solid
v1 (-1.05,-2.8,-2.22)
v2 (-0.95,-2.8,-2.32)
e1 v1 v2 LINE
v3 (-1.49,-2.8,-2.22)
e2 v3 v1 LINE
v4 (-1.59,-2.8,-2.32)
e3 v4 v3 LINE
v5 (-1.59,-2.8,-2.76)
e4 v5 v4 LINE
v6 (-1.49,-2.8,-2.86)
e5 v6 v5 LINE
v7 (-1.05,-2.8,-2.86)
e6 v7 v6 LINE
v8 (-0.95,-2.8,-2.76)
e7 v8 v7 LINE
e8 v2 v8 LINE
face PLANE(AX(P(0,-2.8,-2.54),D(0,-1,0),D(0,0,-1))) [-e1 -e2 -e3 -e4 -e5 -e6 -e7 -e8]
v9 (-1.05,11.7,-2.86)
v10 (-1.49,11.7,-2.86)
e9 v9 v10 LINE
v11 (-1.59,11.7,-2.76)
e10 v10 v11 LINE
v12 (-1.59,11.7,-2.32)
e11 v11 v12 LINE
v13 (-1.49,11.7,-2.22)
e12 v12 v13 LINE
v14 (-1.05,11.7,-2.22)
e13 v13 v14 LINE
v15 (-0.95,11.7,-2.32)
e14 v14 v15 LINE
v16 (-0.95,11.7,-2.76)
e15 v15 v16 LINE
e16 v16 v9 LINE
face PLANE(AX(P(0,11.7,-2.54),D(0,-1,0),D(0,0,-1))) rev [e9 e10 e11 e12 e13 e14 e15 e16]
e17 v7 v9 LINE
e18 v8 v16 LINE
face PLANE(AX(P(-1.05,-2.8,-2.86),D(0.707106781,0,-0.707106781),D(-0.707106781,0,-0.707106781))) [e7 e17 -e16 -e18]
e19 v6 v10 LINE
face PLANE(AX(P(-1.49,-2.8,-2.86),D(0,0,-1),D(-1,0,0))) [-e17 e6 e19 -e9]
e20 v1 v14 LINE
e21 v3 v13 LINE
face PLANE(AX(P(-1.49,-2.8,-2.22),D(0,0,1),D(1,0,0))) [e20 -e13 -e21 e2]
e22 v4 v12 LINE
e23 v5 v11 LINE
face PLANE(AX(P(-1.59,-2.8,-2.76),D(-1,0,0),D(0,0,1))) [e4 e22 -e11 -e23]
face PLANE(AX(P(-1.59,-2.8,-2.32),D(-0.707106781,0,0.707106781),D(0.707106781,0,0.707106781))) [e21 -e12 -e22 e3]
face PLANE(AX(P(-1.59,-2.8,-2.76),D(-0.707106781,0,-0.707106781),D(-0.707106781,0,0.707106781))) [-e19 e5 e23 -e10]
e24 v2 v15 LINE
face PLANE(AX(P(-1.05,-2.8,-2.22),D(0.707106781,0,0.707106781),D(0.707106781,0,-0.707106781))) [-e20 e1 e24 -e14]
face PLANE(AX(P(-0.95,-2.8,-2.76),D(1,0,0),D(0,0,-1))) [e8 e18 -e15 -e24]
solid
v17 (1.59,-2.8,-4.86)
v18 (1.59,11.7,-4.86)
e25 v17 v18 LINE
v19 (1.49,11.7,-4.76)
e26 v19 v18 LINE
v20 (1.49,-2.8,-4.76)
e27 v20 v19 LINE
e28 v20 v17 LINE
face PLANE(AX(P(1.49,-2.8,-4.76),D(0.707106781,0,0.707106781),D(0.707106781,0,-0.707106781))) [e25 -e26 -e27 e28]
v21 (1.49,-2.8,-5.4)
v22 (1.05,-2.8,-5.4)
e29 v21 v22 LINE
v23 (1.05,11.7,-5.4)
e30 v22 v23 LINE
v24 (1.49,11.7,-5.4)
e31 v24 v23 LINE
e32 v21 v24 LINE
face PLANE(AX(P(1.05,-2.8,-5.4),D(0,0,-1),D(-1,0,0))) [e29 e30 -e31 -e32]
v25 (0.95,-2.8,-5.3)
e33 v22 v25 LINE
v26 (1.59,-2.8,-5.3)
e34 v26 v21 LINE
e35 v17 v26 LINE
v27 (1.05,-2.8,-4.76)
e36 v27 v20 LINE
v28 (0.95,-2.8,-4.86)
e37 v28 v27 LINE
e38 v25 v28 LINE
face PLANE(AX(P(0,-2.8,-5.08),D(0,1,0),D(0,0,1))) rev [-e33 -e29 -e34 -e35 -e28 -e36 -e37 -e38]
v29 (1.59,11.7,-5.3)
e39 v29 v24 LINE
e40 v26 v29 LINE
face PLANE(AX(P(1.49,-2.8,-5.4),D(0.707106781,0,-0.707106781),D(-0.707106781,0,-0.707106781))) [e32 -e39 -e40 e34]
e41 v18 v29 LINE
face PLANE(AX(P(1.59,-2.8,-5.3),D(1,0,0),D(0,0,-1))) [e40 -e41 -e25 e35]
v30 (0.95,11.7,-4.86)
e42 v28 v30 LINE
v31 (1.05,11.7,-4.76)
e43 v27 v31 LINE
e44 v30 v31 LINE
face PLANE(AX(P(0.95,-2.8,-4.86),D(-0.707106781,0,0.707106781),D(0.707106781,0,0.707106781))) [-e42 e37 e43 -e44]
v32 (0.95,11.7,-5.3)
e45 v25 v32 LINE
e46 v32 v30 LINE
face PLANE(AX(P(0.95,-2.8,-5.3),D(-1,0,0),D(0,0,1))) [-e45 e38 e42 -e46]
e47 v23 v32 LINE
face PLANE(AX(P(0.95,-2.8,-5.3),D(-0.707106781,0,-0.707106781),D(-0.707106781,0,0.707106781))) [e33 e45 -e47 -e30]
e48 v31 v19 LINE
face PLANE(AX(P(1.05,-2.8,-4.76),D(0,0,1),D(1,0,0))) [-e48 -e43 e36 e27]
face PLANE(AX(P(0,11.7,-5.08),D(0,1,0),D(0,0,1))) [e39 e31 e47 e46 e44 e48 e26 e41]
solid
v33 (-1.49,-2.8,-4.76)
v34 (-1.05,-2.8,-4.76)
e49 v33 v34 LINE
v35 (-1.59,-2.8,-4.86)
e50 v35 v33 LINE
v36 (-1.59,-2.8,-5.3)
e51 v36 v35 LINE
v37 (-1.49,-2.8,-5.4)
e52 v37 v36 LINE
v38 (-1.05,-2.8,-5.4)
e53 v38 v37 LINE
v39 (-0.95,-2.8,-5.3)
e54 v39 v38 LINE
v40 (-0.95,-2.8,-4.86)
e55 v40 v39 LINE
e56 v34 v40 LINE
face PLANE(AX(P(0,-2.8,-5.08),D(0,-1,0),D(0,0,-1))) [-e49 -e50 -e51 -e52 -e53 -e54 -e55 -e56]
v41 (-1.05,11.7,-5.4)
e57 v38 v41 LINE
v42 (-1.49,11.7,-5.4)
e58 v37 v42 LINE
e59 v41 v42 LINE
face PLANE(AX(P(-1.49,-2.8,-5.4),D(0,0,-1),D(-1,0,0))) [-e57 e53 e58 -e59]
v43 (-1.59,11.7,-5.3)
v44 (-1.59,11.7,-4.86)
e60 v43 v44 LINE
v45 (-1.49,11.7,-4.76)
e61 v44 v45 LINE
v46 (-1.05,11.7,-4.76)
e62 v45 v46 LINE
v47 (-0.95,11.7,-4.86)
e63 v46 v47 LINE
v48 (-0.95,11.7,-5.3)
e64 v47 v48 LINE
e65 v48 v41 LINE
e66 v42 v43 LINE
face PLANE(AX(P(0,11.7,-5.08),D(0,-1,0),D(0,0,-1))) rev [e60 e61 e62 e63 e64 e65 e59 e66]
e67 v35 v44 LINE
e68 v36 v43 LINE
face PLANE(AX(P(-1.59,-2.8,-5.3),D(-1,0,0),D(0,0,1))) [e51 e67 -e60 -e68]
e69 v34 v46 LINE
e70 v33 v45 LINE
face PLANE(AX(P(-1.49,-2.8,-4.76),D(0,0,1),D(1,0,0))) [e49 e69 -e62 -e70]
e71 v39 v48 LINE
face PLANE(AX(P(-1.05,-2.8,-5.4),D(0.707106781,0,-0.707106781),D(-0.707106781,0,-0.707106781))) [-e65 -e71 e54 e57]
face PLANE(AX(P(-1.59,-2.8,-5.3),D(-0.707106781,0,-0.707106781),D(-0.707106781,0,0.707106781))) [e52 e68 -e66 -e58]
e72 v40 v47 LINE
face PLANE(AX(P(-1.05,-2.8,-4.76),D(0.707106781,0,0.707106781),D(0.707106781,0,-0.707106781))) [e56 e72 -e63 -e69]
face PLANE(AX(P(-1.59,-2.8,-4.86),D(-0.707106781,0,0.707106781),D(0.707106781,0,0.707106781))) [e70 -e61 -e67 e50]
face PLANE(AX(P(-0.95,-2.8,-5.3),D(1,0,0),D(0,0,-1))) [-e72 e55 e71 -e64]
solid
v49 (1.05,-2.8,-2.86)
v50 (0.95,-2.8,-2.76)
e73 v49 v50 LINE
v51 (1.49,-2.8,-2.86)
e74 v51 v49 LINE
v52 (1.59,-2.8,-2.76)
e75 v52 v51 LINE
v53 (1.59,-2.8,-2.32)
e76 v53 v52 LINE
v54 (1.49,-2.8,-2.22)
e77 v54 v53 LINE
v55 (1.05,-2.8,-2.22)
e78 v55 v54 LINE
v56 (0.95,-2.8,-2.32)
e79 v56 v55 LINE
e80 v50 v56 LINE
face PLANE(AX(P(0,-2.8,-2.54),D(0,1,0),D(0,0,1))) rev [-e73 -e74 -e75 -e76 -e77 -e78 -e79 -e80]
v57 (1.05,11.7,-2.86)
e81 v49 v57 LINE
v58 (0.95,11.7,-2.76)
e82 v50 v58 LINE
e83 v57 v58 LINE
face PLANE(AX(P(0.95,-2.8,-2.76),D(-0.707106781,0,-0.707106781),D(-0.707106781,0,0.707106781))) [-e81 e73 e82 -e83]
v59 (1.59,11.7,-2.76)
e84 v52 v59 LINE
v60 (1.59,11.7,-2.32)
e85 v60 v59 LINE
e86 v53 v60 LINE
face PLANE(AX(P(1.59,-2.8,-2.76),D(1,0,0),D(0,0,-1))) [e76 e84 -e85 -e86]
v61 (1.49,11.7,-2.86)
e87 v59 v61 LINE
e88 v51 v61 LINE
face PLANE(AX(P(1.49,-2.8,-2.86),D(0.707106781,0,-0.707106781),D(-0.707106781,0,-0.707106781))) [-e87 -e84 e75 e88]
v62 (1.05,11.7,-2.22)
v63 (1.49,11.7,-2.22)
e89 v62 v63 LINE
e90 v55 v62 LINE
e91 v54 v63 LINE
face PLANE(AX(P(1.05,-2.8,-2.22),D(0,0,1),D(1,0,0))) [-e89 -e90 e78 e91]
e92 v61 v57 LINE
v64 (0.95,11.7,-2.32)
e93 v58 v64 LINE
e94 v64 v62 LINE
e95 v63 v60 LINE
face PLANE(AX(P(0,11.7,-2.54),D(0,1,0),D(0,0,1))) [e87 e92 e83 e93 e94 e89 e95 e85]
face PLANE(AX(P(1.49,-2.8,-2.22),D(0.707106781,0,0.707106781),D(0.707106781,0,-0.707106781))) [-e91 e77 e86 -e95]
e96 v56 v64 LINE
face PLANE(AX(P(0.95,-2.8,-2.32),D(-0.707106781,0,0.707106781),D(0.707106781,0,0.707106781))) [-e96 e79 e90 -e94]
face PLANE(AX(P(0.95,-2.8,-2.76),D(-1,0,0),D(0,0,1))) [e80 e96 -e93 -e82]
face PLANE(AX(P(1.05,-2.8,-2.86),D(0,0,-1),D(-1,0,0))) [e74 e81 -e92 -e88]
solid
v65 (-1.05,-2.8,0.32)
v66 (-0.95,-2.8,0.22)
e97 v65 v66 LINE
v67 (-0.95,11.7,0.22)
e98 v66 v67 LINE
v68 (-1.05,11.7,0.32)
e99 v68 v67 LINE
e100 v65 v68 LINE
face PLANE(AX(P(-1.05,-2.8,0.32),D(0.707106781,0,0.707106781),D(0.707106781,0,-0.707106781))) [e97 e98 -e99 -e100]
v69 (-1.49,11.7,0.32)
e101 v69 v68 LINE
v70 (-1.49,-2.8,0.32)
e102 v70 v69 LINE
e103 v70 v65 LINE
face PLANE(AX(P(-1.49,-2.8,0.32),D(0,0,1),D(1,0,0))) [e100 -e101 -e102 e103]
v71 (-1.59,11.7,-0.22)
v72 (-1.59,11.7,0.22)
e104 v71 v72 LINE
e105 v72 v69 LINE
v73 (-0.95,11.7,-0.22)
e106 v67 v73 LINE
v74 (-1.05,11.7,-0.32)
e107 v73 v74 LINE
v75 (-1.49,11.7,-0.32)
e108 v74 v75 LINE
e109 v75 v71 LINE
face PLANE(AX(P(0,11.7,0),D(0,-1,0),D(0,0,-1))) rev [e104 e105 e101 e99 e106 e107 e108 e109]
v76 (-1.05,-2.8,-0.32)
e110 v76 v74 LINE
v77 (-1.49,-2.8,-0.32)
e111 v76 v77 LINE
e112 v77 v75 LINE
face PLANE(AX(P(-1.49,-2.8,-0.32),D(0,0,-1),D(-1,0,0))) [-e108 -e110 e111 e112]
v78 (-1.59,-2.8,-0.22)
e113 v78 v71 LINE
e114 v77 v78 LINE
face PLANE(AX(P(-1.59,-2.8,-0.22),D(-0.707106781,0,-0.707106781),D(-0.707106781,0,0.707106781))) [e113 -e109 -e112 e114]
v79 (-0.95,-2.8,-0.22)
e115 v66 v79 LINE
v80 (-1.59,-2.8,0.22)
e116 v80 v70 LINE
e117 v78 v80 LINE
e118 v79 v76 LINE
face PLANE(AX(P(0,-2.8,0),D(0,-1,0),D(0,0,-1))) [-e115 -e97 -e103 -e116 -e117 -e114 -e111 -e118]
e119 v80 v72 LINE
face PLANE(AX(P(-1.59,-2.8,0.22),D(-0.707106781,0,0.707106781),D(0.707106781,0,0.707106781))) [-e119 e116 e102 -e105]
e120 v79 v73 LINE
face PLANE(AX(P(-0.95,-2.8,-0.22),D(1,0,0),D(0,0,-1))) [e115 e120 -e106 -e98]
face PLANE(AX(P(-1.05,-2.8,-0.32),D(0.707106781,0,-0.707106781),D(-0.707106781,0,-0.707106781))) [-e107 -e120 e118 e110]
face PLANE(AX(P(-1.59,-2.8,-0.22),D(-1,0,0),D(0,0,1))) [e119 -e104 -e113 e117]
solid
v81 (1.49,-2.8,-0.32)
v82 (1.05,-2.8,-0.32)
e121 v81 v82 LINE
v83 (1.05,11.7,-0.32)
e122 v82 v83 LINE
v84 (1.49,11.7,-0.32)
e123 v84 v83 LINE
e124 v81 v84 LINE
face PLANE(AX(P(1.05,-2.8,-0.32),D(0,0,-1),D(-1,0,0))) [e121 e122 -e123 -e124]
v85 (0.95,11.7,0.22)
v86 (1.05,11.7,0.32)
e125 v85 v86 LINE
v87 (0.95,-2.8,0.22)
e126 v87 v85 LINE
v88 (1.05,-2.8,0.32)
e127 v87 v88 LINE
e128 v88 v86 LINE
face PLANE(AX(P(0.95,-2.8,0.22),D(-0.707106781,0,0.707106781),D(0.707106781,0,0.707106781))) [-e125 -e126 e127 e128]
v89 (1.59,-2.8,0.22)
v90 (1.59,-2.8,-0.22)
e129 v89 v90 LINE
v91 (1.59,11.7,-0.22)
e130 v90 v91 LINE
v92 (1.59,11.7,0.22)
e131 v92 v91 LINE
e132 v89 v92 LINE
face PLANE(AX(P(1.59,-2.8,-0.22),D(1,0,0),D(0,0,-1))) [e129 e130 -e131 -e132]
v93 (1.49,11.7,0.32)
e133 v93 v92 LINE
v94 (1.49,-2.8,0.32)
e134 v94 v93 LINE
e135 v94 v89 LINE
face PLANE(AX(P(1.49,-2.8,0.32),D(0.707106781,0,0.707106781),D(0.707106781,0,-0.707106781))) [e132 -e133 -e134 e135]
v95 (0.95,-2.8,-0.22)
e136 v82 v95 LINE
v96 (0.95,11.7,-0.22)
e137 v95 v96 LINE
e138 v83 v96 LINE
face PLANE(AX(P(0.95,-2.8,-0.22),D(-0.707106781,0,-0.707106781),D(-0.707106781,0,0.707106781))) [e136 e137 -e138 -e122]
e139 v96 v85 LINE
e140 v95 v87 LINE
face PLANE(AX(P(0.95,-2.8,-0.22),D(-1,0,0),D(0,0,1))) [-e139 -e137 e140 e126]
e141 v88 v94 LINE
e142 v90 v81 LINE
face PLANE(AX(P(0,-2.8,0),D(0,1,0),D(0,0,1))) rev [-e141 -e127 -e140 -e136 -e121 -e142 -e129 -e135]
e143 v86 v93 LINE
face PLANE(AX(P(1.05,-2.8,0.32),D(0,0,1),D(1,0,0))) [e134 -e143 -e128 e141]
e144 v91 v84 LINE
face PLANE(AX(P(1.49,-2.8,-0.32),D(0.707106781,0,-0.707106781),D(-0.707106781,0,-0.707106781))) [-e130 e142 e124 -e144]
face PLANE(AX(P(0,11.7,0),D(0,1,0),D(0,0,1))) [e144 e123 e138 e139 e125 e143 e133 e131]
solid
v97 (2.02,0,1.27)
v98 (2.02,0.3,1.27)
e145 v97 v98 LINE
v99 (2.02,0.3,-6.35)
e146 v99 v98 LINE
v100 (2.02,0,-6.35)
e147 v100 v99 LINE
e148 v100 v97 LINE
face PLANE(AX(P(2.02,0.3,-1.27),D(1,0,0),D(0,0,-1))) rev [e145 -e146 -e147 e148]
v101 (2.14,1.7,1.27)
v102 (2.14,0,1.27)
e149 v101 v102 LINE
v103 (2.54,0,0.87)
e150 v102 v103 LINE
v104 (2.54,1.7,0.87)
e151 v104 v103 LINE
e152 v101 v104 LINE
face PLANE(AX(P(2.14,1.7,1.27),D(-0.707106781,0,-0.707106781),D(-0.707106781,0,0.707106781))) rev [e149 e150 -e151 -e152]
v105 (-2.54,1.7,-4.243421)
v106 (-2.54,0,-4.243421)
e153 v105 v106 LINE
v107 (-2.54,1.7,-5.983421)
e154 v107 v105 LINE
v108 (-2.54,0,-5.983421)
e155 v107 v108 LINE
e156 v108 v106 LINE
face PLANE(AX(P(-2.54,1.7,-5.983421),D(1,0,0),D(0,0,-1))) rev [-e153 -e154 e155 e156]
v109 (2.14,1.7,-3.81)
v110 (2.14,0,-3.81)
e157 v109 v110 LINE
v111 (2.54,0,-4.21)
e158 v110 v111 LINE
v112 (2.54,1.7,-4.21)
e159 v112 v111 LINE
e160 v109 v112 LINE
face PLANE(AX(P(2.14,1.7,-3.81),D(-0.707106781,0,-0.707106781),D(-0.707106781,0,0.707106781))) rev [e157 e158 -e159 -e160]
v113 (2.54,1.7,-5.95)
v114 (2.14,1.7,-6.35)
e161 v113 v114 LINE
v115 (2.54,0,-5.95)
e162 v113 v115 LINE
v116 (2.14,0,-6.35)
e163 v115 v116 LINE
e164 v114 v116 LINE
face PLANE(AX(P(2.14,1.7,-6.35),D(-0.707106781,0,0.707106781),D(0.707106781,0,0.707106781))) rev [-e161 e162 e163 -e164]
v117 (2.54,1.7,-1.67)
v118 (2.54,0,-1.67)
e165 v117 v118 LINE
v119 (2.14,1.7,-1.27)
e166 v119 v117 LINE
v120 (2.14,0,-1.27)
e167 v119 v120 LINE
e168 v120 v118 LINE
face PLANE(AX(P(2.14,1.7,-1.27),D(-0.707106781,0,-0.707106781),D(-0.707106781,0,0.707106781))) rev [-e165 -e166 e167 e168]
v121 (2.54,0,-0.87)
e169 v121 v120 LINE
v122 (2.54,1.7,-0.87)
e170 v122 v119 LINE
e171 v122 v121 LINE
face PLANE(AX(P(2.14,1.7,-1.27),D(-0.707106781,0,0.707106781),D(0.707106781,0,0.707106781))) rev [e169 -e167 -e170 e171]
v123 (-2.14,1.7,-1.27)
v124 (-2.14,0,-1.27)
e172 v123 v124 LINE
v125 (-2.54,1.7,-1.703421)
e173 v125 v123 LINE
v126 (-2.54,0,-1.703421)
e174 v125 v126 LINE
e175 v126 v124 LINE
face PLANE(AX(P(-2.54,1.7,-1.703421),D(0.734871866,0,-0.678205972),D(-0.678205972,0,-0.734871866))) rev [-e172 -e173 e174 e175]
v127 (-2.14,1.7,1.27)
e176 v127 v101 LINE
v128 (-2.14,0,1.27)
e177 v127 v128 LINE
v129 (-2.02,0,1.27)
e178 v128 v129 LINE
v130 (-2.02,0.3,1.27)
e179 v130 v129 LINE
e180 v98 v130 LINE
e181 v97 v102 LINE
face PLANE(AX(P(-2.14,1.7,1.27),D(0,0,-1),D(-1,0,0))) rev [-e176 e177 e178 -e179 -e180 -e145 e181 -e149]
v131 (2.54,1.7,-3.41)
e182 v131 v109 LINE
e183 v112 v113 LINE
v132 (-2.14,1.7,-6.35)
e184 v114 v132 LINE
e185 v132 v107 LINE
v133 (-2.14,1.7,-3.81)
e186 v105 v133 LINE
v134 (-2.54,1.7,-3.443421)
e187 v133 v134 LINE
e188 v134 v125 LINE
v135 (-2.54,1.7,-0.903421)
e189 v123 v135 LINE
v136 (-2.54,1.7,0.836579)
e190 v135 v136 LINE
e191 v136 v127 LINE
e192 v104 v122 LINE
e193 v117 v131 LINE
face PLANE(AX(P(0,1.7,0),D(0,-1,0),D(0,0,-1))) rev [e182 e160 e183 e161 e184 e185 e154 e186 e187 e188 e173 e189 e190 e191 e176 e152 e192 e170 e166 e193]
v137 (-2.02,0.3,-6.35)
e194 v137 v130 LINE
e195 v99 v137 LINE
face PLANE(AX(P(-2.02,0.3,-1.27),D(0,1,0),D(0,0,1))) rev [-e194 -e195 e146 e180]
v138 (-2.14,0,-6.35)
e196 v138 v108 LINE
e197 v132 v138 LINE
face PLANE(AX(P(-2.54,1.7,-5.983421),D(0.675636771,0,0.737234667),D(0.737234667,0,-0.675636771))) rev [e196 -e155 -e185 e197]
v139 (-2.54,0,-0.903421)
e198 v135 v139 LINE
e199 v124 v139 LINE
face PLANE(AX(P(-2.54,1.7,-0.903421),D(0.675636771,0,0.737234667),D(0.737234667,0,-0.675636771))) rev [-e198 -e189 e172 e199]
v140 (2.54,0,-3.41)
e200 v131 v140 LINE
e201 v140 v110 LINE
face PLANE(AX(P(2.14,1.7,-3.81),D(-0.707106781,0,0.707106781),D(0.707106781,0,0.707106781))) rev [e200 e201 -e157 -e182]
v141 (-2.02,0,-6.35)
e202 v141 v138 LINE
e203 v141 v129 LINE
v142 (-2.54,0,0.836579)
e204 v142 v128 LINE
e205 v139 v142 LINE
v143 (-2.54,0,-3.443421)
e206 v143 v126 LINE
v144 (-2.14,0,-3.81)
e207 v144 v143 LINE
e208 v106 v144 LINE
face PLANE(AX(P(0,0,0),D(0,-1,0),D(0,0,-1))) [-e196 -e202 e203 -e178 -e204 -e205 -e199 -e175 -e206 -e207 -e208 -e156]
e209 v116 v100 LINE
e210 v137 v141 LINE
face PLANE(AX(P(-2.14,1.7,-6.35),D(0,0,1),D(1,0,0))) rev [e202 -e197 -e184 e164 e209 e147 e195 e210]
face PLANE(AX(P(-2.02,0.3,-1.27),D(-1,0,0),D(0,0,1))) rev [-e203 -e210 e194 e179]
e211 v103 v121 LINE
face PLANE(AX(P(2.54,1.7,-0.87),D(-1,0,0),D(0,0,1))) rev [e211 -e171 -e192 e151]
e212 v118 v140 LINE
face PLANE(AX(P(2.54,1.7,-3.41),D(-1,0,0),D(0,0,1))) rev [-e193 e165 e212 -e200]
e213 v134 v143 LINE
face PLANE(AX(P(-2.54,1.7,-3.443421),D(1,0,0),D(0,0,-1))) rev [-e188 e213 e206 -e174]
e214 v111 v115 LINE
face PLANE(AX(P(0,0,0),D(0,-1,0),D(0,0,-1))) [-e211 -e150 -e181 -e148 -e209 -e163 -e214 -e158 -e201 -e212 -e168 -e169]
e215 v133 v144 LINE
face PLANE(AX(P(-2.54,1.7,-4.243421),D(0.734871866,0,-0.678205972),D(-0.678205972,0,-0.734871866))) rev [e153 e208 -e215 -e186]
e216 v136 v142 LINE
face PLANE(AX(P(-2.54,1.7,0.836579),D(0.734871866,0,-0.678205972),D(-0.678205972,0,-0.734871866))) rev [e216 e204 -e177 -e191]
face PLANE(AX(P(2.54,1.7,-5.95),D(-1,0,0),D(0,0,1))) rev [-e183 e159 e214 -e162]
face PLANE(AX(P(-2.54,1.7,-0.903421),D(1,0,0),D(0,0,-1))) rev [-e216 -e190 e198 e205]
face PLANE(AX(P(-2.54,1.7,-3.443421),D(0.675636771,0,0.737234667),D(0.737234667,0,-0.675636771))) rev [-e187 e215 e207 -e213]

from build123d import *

# Parameters (mm, degrees)
BOSS_EXTRUDE1_DEPTH   = 1.7
SKETCH2_W             = 4.04
SKETCH2_H             = 0.3
CUT_EXTRUDE1_DEPTH    = 2.54
BOSS_EXTRUDE2_START   = -4.5
BOSS_EXTRUDE2_DEPTH   = 14.5
BOSS_EXTRUDE2_2_DEPTH = 14.5
LPATTERN3_START       = -2.8
LPATTERN3_DEPTH       = 14.5
LPATTERN3_2_DEPTH     = 14.5
LPATTERN3_3_DEPTH     = 14.5
LPATTERN3_4_DEPTH     = 14.5
LPATTERN3_START_2     = 0.3
LPATTERN3_5_DEPTH     = 1.4
LPATTERN3_6_DEPTH     = 0.3


# Read off the part's stored shape, not the designer's step: LPattern3
with BuildPart() as part:
    # Sketch1 → Boss-Extrude1 (new body)
    with BuildSketch(Plane(origin=(0, 0, 0), x_dir=(1, 0, 0), z_dir=(0, 1, 0))):
        Polygon((-2.54, 0.903421053), (-2.14, 1.27), (2.14, 1.27), (2.54, 0.87), (2.54, -0.87), (2.14, -1.27), (-2.14, -1.27), (-2.54, -0.836578947), align=None)
    extrude(amount=BOSS_EXTRUDE1_DEPTH)

    # Sketch2 → Cut-Extrude1 (cut)
    with BuildSketch(Plane.XY.offset(1.27)):
        with Locations((0, 0.15)):
            Rectangle(SKETCH2_W, SKETCH2_H)
    extrude(amount=-CUT_EXTRUDE1_DEPTH, mode=Mode.SUBTRACT)

    # LPattern3 5 outline → LPattern3 5 (add)
    with BuildSketch(Plane(origin=(0, 0, 0), x_dir=(1, 0, 0), z_dir=(0, 1, 0)).offset(LPATTERN3_START_2)):
        Polygon((-2.54, 3.443421053), (-2.54, 1.703421053), (-2.14, 1.27), (2.14, 1.27), (2.54, 1.67), (2.54, 3.41), (2.14, 3.81), (2.54, 4.21), (2.54, 5.95), (2.14, 6.35), (-2.14, 6.35), (-2.54, 5.983421053), (-2.54, 4.243421053), (-2.14, 3.81), align=None)
    extrude(amount=LPATTERN3_5_DEPTH)

    # LPattern3 6 outline → LPattern3 6 (add)
    with BuildSketch(Plane(origin=(0, 0, 0), x_dir=(1, 0, 0), z_dir=(0, 1, 0))):
        Polygon((-2.54, 3.443421053), (-2.54, 1.703421053), (-2.14, 1.27), (-2.02, 1.27), (-2.02, 6.35), (-2.14, 6.35), (-2.54, 5.983421053), (-2.54, 4.243421053), (-2.14, 3.81), align=None)
        Polygon((2.02, 6.35), (2.02, 1.27), (2.14, 1.27), (2.54, 1.67), (2.54, 3.41), (2.14, 3.81), (2.54, 4.21), (2.54, 5.95), (2.14, 6.35), align=None)
    extrude(amount=LPATTERN3_6_DEPTH)


with BuildPart() as body_2:
    # Sketch3 → Boss-Extrude2 (new body)
    with BuildSketch(Plane(origin=(0, 1.7, 0), x_dir=(1, 0, 0), z_dir=(0, 1, 0)).offset(BOSS_EXTRUDE2_START)):
        Polygon((-1.49, 0.32), (-1.05, 0.32), (-0.95, 0.22), (-0.95, -0.22), (-1.05, -0.32), (-1.49, -0.32), (-1.59, -0.22), (-1.59, 0.22), align=None)
    extrude(amount=BOSS_EXTRUDE2_DEPTH)


with BuildPart() as body_3:
    # Sketch3 → Boss-Extrude2 2 (new body)
    with BuildSketch(Plane(origin=(0, 1.7, 0), x_dir=(1, 0, 0), z_dir=(0, 1, 0)).offset(BOSS_EXTRUDE2_START)):
        Polygon((1.05, 0.32), (1.49, 0.32), (1.59, 0.22), (1.59, -0.22), (1.49, -0.32), (1.05, -0.32), (0.95, -0.22), (0.95, 0.22), align=None)
    extrude(amount=BOSS_EXTRUDE2_2_DEPTH)


with BuildPart() as body_4:
    # LPattern3 outline → LPattern3 (new body)
    with BuildSketch(Plane(origin=(0, 0, 0), x_dir=(1, 0, 0), z_dir=(0, 1, 0)).offset(LPATTERN3_START)):
        Polygon((0.95, 5.3), (0.95, 4.86), (1.05, 4.76), (1.49, 4.76), (1.59, 4.86), (1.59, 5.3), (1.49, 5.4), (1.05, 5.4), align=None)
    extrude(amount=LPATTERN3_DEPTH)


with BuildPart() as body_5:
    # LPattern3 2 outline → LPattern3 2 (new body)
    with BuildSketch(Plane(origin=(0, 0, 0), x_dir=(1, 0, 0), z_dir=(0, 1, 0)).offset(LPATTERN3_START)):
        Polygon((-1.05, 5.4), (-1.49, 5.4), (-1.59, 5.3), (-1.59, 4.86), (-1.49, 4.76), (-1.05, 4.76), (-0.95, 4.86), (-0.95, 5.3), align=None)
    extrude(amount=LPATTERN3_2_DEPTH)


with BuildPart() as body_6:
    # LPattern3 3 outline → LPattern3 3 (new body)
    with BuildSketch(Plane(origin=(0, 0, 0), x_dir=(1, 0, 0), z_dir=(0, 1, 0)).offset(LPATTERN3_START)):
        Polygon((0.95, 2.76), (0.95, 2.32), (1.05, 2.22), (1.49, 2.22), (1.59, 2.32), (1.59, 2.76), (1.49, 2.86), (1.05, 2.86), align=None)
    extrude(amount=LPATTERN3_3_DEPTH)


with BuildPart() as body_7:
    # LPattern3 4 outline → LPattern3 4 (new body)
    with BuildSketch(Plane(origin=(0, 0, 0), x_dir=(1, 0, 0), z_dir=(0, 1, 0)).offset(LPATTERN3_START)):
        Polygon((-1.05, 2.86), (-1.49, 2.86), (-1.59, 2.76), (-1.59, 2.32), (-1.49, 2.22), (-1.05, 2.22), (-0.95, 2.32), (-0.95, 2.76), align=None)
    extrude(amount=LPATTERN3_4_DEPTH)


solid = Compound([part.part, body_2.part, body_3.part, body_4.part, body_5.part, body_6.part, body_7.part])
